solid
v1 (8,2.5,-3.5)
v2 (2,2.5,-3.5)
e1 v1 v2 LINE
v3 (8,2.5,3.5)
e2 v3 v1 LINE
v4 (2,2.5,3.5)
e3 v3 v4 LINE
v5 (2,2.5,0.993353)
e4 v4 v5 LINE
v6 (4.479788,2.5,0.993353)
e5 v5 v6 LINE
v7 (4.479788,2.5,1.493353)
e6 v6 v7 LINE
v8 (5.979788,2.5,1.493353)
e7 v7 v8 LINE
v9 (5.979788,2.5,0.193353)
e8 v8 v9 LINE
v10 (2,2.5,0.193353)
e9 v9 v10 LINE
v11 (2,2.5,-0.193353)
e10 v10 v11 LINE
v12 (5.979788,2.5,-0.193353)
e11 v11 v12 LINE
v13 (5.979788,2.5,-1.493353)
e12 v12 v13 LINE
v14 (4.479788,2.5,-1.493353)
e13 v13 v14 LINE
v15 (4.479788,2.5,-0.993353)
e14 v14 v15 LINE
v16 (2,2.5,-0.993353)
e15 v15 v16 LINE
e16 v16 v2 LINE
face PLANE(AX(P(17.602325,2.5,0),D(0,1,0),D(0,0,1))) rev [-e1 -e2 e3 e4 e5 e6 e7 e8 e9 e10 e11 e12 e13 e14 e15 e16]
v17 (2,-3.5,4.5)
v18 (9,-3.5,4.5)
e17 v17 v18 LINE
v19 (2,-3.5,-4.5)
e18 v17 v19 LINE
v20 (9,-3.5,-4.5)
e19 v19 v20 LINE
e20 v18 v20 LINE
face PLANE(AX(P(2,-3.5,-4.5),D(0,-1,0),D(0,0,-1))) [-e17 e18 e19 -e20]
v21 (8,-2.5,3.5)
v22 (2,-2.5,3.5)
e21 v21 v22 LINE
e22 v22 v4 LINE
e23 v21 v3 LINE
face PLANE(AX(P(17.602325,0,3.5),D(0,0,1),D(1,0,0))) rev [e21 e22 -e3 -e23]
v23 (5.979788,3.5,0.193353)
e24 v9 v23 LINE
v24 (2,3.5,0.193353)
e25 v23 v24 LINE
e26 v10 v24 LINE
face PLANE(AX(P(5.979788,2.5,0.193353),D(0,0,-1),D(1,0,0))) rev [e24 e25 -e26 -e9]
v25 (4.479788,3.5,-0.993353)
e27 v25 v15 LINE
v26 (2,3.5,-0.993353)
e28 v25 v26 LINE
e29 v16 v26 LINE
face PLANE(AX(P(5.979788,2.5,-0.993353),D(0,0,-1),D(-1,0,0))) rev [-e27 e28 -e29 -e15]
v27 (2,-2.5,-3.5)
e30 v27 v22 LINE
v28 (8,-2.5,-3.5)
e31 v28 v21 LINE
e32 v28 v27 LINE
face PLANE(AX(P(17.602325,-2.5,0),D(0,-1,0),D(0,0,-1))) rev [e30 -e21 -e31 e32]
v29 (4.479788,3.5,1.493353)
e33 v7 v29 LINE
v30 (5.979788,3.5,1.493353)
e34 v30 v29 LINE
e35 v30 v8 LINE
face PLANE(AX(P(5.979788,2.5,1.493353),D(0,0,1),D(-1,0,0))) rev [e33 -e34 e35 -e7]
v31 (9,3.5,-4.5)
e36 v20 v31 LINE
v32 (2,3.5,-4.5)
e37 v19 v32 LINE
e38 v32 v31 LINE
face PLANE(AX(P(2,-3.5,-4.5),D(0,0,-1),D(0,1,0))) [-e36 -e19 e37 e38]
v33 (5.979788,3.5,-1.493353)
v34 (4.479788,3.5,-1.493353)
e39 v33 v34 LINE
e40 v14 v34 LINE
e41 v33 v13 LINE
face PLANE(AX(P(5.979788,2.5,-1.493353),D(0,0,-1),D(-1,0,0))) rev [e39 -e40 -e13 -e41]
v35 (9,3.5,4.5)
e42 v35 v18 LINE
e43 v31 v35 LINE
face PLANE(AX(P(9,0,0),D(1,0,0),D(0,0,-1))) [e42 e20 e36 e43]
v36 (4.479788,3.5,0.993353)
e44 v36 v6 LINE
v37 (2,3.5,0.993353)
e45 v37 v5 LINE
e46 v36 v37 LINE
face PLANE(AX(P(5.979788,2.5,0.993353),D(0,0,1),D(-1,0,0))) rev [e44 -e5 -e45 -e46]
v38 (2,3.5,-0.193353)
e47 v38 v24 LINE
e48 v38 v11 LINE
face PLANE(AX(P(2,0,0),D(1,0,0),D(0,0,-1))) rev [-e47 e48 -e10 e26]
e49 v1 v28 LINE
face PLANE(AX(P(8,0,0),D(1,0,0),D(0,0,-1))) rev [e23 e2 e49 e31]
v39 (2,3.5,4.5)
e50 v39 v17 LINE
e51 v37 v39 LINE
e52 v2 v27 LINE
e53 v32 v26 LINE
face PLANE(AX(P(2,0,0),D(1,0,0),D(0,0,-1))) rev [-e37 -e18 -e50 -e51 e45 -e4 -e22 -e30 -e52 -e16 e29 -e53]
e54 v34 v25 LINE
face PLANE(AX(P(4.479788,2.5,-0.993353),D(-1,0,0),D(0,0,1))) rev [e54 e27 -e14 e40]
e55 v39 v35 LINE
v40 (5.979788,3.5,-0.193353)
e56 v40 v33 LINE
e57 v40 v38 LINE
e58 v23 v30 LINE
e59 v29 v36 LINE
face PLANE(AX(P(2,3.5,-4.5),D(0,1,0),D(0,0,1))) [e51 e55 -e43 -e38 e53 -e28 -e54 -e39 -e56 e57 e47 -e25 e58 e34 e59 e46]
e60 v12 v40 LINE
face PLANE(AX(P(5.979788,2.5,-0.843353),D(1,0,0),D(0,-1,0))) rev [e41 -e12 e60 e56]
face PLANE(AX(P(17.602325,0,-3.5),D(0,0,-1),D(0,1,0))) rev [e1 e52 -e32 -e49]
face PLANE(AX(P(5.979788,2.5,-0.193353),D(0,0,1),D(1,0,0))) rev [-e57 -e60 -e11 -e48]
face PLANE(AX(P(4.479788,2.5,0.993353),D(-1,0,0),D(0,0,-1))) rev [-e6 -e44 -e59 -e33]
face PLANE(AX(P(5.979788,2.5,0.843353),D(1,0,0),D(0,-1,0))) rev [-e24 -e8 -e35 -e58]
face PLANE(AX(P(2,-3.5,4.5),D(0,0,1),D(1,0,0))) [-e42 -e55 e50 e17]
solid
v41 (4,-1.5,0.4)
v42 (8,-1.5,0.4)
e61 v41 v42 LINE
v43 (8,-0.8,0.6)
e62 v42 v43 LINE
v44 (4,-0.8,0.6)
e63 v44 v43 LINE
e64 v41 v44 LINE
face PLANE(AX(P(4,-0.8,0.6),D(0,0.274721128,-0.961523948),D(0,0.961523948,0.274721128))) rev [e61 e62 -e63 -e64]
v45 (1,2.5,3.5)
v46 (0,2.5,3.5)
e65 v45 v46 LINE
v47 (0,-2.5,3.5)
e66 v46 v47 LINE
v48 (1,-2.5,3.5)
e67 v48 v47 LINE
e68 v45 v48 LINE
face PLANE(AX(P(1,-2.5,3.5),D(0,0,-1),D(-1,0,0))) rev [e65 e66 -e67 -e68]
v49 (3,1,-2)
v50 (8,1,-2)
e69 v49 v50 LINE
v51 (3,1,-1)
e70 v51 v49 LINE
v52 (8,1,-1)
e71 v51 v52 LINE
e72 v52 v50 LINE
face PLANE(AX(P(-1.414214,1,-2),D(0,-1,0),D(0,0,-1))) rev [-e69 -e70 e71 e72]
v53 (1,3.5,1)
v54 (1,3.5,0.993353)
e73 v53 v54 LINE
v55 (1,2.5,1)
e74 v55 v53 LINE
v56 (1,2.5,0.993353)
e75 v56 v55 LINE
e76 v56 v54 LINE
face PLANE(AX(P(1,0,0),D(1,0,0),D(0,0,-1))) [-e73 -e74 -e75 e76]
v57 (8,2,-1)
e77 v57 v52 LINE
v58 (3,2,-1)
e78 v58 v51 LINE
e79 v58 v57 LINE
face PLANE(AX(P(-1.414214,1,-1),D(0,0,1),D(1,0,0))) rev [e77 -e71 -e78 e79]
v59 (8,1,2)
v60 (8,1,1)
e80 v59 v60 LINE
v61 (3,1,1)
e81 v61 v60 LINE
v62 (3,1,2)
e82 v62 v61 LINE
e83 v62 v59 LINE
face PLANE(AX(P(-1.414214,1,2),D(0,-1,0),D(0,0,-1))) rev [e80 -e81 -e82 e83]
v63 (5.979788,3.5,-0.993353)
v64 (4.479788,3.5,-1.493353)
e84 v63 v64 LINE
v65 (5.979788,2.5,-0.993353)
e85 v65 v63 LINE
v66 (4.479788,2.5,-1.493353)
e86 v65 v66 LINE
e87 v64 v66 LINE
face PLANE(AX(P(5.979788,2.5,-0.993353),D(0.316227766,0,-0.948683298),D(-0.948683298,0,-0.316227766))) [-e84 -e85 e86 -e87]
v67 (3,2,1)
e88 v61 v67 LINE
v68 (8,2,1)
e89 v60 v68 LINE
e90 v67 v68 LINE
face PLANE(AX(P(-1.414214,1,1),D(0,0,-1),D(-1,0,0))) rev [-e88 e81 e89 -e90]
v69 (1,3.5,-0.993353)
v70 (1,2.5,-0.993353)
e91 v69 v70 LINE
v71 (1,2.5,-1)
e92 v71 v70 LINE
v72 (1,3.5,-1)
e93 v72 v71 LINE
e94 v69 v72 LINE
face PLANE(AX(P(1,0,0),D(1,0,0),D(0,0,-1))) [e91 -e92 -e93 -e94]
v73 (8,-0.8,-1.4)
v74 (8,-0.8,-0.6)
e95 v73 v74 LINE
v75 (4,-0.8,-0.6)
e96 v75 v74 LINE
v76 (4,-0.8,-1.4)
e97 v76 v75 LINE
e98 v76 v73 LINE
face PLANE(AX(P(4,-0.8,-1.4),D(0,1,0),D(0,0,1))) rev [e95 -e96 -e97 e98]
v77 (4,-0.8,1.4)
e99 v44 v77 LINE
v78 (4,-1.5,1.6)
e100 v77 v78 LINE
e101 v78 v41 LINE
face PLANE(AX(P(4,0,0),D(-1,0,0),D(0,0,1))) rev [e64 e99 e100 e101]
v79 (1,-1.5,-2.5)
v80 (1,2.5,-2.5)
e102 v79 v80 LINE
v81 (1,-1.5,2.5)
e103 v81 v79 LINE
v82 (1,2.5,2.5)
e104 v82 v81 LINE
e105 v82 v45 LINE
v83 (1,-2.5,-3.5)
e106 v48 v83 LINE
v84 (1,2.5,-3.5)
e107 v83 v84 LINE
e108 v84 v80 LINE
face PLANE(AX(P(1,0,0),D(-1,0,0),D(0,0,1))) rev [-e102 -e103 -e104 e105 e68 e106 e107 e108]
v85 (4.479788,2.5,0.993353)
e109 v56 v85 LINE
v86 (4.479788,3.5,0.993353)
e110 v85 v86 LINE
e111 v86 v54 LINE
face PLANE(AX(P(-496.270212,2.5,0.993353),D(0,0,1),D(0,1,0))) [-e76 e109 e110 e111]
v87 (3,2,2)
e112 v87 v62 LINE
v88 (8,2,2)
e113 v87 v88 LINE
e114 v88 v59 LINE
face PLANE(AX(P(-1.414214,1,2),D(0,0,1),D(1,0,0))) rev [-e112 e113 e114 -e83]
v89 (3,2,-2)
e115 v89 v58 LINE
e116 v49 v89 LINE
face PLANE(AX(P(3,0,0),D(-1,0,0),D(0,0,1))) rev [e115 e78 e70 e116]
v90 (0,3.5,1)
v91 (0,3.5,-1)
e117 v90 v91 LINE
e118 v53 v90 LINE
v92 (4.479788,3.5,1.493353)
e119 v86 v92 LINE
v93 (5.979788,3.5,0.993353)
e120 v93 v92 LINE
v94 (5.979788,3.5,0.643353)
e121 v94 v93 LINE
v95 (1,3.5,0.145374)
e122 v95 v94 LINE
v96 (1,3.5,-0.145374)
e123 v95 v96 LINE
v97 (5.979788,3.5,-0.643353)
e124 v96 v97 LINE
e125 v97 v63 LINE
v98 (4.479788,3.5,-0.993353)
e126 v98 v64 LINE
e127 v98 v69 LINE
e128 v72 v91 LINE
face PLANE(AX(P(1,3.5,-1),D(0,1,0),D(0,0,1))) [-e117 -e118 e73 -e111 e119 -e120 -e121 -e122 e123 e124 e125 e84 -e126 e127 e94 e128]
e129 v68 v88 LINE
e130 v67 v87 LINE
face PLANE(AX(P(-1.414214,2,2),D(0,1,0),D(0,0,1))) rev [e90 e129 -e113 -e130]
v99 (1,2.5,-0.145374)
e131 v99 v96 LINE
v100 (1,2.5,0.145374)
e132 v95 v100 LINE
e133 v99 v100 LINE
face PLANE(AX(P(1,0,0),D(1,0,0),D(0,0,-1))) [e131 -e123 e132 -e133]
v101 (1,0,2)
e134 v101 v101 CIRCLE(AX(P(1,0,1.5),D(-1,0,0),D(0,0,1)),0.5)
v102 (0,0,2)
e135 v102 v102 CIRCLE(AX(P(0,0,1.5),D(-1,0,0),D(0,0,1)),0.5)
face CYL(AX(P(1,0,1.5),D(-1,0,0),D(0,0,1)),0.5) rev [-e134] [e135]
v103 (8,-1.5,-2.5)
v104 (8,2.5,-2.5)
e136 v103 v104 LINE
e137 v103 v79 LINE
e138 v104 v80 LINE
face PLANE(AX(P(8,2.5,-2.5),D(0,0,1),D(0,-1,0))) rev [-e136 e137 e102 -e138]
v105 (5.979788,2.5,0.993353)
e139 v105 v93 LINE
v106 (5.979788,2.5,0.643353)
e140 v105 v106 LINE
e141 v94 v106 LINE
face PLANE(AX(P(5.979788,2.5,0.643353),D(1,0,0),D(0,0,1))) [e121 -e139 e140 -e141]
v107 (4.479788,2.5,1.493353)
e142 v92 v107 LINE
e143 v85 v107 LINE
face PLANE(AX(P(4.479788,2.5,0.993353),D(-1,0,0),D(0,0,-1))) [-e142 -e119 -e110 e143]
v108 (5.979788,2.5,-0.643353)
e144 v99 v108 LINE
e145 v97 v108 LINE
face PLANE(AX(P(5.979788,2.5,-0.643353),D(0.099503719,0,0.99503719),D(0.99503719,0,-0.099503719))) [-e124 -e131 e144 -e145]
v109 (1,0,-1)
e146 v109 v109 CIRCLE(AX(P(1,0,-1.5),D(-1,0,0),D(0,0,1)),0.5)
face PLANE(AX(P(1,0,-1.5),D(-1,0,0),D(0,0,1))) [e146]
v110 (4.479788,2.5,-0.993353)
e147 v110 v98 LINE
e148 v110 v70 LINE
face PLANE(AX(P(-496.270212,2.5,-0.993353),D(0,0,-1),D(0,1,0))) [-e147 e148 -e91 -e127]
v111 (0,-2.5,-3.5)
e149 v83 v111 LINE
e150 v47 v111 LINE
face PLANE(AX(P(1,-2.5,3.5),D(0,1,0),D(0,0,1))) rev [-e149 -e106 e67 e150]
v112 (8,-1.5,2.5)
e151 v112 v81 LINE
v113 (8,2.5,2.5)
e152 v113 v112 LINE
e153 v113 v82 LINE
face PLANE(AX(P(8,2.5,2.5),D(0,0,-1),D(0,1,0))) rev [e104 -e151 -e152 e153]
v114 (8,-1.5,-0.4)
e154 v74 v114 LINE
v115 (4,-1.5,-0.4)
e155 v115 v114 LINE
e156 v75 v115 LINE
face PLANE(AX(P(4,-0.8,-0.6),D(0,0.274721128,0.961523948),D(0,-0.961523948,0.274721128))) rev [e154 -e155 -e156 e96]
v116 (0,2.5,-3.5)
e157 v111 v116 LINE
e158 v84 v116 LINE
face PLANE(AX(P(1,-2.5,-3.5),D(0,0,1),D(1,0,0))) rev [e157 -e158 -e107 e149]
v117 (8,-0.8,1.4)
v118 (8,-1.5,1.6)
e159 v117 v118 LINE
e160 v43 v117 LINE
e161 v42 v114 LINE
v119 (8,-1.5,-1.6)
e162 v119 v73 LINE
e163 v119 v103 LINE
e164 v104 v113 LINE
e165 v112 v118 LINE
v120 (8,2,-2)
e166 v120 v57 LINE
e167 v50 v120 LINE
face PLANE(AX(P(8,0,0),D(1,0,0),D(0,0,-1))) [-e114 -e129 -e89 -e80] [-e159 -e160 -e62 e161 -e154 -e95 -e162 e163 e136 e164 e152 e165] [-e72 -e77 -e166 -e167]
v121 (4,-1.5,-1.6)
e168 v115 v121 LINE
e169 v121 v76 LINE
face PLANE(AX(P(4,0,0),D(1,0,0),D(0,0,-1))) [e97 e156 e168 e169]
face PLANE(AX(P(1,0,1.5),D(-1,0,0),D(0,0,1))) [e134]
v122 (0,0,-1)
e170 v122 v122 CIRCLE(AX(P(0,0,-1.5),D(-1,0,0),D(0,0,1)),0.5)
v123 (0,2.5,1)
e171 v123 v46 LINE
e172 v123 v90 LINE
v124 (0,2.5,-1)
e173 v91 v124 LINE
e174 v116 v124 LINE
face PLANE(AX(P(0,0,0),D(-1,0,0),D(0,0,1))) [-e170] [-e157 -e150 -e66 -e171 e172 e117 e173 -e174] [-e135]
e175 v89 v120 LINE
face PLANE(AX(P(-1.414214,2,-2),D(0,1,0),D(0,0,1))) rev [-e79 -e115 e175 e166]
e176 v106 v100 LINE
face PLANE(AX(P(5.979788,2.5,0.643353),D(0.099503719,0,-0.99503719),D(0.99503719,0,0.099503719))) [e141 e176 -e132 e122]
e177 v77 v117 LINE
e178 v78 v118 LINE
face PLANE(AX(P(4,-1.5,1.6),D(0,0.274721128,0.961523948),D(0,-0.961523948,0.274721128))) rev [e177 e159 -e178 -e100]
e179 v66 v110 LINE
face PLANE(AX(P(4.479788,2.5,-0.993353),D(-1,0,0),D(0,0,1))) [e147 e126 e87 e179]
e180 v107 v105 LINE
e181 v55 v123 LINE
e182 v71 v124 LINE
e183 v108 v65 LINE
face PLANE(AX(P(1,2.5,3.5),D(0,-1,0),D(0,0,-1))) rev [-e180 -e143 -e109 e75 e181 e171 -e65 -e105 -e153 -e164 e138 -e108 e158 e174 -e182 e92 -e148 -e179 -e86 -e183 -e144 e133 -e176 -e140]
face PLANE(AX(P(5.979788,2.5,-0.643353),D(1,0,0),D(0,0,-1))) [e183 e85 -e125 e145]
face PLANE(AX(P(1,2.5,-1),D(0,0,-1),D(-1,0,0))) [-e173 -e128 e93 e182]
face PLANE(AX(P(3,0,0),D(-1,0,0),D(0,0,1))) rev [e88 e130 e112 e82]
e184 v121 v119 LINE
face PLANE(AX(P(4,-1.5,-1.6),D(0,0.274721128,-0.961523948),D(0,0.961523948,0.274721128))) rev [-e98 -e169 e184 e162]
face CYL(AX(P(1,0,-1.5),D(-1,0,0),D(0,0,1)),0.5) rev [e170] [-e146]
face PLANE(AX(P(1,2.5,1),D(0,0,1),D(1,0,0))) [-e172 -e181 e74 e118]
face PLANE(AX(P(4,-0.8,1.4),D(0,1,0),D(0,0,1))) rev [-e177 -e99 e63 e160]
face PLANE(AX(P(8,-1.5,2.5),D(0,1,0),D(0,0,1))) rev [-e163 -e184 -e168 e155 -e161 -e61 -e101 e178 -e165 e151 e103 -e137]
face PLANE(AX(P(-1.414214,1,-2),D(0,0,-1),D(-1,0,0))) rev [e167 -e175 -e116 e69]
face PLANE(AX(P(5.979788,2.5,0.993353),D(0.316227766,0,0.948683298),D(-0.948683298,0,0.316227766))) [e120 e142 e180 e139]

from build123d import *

# Parameters (mm, degrees)
SKETCH1_W                = 7
SKETCH1_H                = 5
BOSS_EXTRUDE1_DEPTH      = 1
SKETCH3_W                = 5
SKETCH3_H                = 4
BOSS_EXTRUDE2_DEPTH      = 7
SKETCH4_W                = 1
SKETCH4_H                = 1
CUT_EXTRUDE1_DEPTH       = 5
CUT_EXTRUDE3_DEPTH       = 4
SKETCH7_W                = 2
SKETCH7_H                = 1
BOSS_EXTRUDE3_DEPTH      = 1
SNAP_START               = 2.5
SNAP_HOOK3_DEPTH         = 1
SKETCH8_R                = 0.5
CUT_EXTRUDE4_DEPTH       = 1
SKETCH9_W                = 9
SKETCH9_H                = 7
BOSS_EXTRUDE4_DEPTH      = 7
SKETCH10_W               = 7
SKETCH10_H               = 5
CUT_EXTRUDE5_DEPTH       = 6
SNAP_START_2             = 2
SNAP_GROOVE1_OUTLINE_W   = 1
SNAP_GROOVE1_OUTLINE_H   = 0.8
SNAP_GROOVE1_DEPTH       = 3.979788025
SNAP_START_3             = 4.479788025
SNAP_GROOVE1_2_OUTLINE_W = 1
SNAP_GROOVE1_2_OUTLINE_H = 0.5
SNAP_GROOVE1_2_DEPTH     = 1.5


# Read off the part's stored shape, not the designer's step: Snap Hook3, Snap Groove1
with BuildPart() as part:
    # Sketch1 → Boss-Extrude1 (new body)
    with BuildSketch(Plane(origin=(0, 0, 0), x_dir=(0, 0, -1), z_dir=(1, 0, 0))):
        Rectangle(SKETCH1_W, SKETCH1_H)
    extrude(amount=BOSS_EXTRUDE1_DEPTH)

    # Sketch3 → Boss-Extrude2 (add)
    with BuildSketch(Plane(origin=(1, 0, 0), x_dir=(0, 0, -1), z_dir=(1, 0, 0))):
        with Locations((0, 0.5)):
            Rectangle(SKETCH3_W, SKETCH3_H)
    extrude(amount=BOSS_EXTRUDE2_DEPTH)

    # Sketch4 → Cut-Extrude1 (cut)
    with BuildSketch(Plane(origin=(8, 0, 0), x_dir=(0, 0, -1), z_dir=(1, 0, 0))):
        with Locations((-1.5, 1.5)):
            Rectangle(SKETCH4_W, SKETCH4_H)
        with Locations((1.5, 1.5)):
            Rectangle(SKETCH4_W, SKETCH4_H)
    extrude(amount=-CUT_EXTRUDE1_DEPTH, mode=Mode.SUBTRACT)

    # Sketch6 → Cut-Extrude3 (cut)
    with BuildSketch(Plane(origin=(8, 0, 0), x_dir=(0, 0, -1), z_dir=(1, 0, 0))):
        Polygon((-1.6, -1.5), (-1.4, -0.8), (-0.6, -0.8), (-0.4, -1.5), align=None)
        Polygon((0.4, -1.5), (1.6, -1.5), (1.4, -0.8), (0.6, -0.8), align=None)
    extrude(amount=-CUT_EXTRUDE3_DEPTH, mode=Mode.SUBTRACT)

    # Sketch7 → Boss-Extrude3 (add)
    with BuildSketch(Plane.ZY):
        with Locations((0, 3)):
            Rectangle(SKETCH7_W, SKETCH7_H)
    extrude(amount=-BOSS_EXTRUDE3_DEPTH)

    # Snap Hook3 outline → Snap Hook3 (add)
    with BuildSketch(Plane(origin=(0, 0, 0), x_dir=(1, 0, 0), z_dir=(0, 1, 0)).offset(SNAP_START)):
        Polygon((5.979788025, 0.993352766), (4.479788025, 1.493352766), (4.479788025, 0.993352766), (1, 0.993352766), (1, 0.145373963), (5.979788025, 0.643352766), align=None)
    snap_hook3 = extrude(amount=SNAP_HOOK3_DEPTH)

    # Mirror1: Snap Hook3 across plane
    add(snap_hook3.mirror(Plane.XY))

    # Sketch8 → Cut-Extrude4 (cut)
    with BuildSketch(Plane.ZY):
        with Locations((-1.5, 0)):
            Circle(SKETCH8_R)
        with Locations((1.5, 0)):
            Circle(SKETCH8_R)
    extrude(amount=-CUT_EXTRUDE4_DEPTH, mode=Mode.SUBTRACT)


with BuildPart() as body_2:
    # Sketch9 → Boss-Extrude4 (new body)
    with BuildSketch(Plane(origin=(9, 0, 0), x_dir=(0, 0, -1), z_dir=(1, 0, 0))):
        Rectangle(SKETCH9_W, SKETCH9_H)
    extrude(amount=-BOSS_EXTRUDE4_DEPTH)

    # Sketch10 → Cut-Extrude5 (cut)
    with BuildSketch(Plane.ZY.offset(-2)):
        Rectangle(SKETCH10_W, SKETCH10_H)
    extrude(amount=-CUT_EXTRUDE5_DEPTH, mode=Mode.SUBTRACT)

    # Snap Groove1 outline → Snap Groove1 (cut)
    with BuildSketch(Plane.YZ.offset(SNAP_START_2)):
        with Locations((3, -0.593352766)):
            Rectangle(SNAP_GROOVE1_OUTLINE_W, SNAP_GROOVE1_OUTLINE_H)
    snap_groove1 = extrude(amount=SNAP_GROOVE1_DEPTH, mode=Mode.SUBTRACT)

    # Snap Groove1 2 outline → Snap Groove1 2 (cut)
    with BuildSketch(Plane.YZ.offset(SNAP_START_3)):
        with Locations((3, -1.243352766)):
            Rectangle(SNAP_GROOVE1_2_OUTLINE_W, SNAP_GROOVE1_2_OUTLINE_H)
    snap_groove1_2 = extrude(amount=SNAP_GROOVE1_2_DEPTH, mode=Mode.SUBTRACT)

    # Mirror2: Snap Groove1, Snap Groove1 2 across plane
    add(snap_groove1.mirror(Plane.XY), mode=Mode.SUBTRACT)
    add(snap_groove1_2.mirror(Plane.XY), mode=Mode.SUBTRACT)


solid = Compound([part.part, body_2.part])
